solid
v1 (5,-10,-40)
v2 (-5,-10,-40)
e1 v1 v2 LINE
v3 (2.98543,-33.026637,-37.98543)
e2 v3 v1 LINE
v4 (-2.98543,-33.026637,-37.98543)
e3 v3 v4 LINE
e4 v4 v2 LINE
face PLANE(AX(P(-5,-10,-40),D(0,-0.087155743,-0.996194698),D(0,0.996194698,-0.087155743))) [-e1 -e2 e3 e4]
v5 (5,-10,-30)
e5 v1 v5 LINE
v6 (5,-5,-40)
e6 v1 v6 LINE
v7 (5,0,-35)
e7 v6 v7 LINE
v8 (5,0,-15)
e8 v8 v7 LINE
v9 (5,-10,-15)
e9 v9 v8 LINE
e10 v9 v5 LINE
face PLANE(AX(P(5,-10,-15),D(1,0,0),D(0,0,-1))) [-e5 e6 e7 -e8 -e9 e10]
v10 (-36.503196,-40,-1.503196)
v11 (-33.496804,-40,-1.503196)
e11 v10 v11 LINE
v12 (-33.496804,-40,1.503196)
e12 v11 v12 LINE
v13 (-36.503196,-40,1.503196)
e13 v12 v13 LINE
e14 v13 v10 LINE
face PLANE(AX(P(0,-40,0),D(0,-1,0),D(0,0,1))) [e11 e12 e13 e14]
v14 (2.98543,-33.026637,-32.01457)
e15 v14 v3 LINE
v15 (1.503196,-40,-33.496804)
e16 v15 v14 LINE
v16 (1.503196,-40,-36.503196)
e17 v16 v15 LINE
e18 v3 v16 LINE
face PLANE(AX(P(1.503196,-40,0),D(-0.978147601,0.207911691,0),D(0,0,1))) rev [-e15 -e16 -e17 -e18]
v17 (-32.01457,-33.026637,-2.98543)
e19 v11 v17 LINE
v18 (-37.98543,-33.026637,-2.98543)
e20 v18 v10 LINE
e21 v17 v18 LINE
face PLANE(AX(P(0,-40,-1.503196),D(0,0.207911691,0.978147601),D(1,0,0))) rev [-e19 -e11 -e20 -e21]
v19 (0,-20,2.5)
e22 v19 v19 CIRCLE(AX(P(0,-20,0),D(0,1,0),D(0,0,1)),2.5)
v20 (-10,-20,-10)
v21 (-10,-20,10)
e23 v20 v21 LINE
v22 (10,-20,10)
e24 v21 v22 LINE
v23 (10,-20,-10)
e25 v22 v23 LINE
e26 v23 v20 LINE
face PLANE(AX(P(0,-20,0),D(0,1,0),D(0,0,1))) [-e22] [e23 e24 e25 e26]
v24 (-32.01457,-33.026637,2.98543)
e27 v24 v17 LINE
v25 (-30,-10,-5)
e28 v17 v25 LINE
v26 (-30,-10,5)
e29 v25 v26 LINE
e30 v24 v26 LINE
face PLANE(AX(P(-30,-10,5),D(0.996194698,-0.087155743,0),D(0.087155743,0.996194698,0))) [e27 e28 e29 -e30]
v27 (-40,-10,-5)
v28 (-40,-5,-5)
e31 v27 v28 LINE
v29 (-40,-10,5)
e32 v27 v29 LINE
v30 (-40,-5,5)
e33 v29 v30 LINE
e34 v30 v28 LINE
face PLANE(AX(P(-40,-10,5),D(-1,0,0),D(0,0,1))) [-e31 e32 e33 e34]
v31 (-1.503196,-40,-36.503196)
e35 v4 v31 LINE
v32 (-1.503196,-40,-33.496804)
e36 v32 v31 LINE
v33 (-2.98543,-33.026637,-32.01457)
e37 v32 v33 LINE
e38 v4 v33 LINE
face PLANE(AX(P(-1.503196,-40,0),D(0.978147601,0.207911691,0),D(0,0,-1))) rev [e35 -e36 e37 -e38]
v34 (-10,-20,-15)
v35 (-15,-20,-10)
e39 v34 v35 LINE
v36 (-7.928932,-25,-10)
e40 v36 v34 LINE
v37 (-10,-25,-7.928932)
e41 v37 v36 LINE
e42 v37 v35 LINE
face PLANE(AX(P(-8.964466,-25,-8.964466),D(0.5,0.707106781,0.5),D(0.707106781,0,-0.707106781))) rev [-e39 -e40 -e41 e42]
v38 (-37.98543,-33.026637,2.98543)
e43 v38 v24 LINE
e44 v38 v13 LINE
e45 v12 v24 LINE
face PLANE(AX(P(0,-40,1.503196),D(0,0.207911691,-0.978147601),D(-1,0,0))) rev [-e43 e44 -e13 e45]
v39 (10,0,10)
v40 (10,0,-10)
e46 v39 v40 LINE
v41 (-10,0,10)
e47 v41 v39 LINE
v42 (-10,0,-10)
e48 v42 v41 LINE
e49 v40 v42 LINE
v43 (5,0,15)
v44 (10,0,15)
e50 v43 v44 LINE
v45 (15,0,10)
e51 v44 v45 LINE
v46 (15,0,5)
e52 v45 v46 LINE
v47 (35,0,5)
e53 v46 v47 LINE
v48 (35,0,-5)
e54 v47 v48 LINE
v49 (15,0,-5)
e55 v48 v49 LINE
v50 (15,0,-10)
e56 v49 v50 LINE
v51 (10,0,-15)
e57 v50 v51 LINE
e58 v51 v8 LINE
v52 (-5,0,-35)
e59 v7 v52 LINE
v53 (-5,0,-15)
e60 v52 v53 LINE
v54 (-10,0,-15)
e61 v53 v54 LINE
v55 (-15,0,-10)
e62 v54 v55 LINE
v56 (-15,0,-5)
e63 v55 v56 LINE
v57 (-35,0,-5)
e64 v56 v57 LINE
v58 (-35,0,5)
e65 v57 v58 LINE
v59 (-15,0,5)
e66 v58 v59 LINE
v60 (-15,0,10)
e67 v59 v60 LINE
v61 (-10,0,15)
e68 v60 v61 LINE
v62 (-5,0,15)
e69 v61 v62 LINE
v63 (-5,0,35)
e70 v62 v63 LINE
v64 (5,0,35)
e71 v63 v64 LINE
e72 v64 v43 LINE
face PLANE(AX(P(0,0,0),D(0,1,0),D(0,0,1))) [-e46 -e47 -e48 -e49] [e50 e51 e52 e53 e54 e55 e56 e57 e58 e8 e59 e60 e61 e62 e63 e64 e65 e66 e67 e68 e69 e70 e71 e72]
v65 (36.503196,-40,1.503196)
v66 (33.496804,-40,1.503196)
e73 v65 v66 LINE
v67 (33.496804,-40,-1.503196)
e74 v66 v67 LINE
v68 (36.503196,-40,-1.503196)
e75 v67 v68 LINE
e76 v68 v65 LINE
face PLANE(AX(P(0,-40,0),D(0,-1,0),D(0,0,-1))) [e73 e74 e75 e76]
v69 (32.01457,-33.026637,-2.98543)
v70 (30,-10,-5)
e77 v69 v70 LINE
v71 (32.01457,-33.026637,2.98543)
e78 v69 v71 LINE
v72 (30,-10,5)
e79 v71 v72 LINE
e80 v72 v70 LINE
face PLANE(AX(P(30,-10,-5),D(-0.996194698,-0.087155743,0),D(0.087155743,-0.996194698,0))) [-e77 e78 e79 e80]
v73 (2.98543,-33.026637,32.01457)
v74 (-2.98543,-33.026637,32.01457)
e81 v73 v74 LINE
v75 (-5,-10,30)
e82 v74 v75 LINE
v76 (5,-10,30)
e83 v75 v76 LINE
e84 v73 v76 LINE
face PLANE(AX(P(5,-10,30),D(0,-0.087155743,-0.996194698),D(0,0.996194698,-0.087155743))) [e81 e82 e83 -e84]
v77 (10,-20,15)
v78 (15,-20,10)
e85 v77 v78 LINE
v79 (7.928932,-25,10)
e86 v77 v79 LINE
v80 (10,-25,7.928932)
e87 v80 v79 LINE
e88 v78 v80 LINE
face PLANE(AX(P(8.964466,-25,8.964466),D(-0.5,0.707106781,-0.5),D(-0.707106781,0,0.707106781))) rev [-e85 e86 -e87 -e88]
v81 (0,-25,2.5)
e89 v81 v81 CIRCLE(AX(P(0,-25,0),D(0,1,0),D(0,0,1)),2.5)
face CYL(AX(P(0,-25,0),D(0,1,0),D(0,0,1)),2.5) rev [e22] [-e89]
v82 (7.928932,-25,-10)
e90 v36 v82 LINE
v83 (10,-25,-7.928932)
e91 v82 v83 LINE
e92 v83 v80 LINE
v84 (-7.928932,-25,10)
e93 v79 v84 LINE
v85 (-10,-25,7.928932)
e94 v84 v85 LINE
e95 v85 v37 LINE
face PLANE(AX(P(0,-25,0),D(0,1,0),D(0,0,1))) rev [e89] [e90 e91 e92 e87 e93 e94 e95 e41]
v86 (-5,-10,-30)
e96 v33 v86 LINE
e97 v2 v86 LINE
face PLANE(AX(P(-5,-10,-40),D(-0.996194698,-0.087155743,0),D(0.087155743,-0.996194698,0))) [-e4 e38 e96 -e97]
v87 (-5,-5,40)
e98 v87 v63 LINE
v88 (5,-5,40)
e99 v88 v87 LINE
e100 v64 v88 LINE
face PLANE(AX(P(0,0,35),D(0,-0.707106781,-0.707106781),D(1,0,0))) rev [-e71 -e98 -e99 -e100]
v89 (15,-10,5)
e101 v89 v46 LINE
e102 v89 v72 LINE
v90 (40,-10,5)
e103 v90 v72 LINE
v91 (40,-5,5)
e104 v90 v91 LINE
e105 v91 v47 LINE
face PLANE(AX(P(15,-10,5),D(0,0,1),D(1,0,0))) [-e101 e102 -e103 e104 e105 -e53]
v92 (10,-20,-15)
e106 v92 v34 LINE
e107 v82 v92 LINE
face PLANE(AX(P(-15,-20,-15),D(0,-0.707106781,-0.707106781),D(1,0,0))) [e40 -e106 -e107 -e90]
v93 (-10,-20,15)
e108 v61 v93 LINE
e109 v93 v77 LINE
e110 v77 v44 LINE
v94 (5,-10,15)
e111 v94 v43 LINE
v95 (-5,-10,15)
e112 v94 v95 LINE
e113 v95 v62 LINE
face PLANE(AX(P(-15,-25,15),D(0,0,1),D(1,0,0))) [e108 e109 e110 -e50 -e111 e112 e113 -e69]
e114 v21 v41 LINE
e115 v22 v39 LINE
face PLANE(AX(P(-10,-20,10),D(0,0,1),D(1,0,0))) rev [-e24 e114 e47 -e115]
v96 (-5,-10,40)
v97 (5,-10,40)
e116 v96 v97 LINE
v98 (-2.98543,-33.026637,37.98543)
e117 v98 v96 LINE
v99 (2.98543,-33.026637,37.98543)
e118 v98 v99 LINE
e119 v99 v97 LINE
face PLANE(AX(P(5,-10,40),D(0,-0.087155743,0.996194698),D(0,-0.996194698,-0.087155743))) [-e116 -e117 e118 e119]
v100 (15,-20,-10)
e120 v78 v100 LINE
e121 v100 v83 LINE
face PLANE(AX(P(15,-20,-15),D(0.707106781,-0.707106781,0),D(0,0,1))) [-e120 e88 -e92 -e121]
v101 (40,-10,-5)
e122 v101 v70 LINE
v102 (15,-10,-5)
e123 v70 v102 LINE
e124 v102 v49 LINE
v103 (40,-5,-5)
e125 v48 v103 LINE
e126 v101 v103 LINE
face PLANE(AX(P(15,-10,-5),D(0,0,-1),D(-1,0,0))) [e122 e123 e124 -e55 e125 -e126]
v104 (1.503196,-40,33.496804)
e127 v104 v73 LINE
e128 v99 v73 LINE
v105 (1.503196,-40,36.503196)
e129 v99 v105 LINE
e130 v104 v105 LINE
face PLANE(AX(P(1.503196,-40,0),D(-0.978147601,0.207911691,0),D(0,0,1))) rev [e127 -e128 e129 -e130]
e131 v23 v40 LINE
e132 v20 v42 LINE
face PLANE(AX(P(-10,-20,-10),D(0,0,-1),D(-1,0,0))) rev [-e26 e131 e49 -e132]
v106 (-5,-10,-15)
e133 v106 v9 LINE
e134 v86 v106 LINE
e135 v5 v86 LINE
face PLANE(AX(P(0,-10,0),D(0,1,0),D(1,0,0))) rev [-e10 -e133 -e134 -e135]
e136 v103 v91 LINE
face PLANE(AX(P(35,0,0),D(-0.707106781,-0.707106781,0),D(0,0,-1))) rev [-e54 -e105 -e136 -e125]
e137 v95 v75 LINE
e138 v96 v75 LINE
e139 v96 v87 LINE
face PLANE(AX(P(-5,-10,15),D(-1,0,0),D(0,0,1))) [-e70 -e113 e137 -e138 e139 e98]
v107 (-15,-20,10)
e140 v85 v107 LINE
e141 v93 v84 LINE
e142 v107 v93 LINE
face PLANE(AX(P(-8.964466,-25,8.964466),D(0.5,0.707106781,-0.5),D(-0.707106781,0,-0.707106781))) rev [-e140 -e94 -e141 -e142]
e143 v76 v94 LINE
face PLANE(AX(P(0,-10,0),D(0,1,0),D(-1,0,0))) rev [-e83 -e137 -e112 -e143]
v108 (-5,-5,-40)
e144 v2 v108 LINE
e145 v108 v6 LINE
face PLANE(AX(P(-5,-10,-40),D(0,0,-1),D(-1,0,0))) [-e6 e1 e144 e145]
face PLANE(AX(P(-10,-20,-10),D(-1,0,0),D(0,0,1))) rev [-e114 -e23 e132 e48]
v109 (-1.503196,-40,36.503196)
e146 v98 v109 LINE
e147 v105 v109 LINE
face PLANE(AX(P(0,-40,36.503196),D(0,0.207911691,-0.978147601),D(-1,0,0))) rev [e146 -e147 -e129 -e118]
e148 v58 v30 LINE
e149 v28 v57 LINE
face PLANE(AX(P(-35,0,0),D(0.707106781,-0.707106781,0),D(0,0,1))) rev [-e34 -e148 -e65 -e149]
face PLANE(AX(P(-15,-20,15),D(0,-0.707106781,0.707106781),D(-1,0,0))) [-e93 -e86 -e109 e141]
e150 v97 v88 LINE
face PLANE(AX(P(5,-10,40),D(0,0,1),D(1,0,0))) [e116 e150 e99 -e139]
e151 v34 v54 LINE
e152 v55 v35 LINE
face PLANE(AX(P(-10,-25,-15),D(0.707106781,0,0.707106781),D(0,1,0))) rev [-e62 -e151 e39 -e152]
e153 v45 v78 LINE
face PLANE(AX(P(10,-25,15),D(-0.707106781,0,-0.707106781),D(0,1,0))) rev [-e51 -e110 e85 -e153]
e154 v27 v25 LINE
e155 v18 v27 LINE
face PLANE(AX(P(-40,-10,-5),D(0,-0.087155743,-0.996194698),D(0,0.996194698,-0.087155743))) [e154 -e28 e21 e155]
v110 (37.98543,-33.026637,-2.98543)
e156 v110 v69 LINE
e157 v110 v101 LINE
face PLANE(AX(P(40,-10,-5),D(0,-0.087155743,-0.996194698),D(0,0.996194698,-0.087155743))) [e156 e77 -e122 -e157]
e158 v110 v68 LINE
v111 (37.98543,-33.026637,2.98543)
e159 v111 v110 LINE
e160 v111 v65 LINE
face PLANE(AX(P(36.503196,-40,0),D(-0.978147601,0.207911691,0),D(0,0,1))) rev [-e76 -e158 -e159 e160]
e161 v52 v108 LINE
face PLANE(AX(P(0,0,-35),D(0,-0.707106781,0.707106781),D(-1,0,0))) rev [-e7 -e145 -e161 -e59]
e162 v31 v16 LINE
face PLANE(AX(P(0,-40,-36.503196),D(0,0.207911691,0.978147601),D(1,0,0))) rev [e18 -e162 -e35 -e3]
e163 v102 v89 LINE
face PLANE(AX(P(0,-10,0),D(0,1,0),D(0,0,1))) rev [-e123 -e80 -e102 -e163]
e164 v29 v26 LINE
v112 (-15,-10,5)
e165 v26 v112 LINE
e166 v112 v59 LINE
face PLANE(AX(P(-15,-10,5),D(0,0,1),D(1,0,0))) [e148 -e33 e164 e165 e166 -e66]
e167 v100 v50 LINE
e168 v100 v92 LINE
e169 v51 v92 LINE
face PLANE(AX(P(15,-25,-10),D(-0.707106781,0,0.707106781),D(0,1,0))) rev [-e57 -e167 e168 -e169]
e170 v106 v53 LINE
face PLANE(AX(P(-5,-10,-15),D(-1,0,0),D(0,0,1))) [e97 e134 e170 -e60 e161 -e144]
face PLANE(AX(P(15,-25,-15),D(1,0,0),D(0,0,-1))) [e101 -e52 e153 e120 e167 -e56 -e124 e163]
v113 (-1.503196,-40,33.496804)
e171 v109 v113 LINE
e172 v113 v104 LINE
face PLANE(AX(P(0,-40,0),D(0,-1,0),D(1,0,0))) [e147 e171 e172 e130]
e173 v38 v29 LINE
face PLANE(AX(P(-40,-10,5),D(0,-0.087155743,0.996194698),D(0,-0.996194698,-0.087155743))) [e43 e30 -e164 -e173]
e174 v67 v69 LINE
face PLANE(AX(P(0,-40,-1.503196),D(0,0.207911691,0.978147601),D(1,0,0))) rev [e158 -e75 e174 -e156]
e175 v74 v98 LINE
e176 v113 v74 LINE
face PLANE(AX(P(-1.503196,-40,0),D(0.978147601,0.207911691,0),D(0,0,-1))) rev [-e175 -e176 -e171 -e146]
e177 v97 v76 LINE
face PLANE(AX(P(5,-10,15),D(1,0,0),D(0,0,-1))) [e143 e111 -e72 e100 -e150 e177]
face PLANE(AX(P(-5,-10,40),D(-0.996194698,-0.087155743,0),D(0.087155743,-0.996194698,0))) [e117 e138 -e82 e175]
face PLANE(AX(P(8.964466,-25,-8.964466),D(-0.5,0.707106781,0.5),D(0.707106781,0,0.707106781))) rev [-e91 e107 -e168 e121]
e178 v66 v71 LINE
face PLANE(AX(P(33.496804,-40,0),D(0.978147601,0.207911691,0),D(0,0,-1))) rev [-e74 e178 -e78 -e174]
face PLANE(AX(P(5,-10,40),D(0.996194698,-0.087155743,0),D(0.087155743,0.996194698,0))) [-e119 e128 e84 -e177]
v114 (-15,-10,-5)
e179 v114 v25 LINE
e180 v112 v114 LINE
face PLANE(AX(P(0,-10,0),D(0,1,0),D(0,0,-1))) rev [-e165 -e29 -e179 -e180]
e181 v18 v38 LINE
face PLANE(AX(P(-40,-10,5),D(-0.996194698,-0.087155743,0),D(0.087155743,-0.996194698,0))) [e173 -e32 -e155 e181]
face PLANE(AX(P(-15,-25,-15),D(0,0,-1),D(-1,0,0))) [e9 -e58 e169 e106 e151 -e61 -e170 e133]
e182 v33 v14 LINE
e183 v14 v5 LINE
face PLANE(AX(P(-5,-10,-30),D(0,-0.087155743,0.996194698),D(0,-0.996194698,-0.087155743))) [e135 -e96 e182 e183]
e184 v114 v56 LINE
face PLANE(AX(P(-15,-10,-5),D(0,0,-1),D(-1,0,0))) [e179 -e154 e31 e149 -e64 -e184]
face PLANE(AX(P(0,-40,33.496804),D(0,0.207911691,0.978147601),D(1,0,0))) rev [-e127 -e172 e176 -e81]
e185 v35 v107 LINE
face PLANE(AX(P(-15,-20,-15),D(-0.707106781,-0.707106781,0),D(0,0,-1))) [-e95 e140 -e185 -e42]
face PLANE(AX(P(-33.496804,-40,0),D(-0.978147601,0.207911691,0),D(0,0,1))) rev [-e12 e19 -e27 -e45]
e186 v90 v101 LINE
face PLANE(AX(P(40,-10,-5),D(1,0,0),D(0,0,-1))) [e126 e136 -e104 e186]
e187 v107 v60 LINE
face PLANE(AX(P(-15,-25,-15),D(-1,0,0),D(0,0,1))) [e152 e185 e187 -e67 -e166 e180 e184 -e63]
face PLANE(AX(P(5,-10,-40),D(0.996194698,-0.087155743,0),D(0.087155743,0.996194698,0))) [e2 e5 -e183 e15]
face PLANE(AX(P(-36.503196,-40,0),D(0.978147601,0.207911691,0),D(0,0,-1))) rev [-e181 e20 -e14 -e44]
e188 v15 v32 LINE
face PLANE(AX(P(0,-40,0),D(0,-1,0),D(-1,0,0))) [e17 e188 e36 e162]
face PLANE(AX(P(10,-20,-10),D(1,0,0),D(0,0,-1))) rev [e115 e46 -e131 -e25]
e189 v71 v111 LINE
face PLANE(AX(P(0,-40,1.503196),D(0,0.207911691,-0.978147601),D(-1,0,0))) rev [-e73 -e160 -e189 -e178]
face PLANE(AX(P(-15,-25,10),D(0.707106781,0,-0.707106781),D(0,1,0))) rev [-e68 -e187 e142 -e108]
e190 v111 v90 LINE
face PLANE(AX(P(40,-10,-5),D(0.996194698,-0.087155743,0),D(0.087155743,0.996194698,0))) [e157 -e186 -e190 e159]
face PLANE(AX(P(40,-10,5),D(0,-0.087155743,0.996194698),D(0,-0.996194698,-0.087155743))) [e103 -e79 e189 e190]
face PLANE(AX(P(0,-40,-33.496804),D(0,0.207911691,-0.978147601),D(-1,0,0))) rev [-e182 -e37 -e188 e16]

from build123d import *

# Parameters (mm, degrees)
SKETCH1_W         = 30
SKETCH1_H         = 30
CENTER_DEPTH      = 25
SKETCH2_W         = 20
SKETCH2_H         = 20
CENTER_HOLE_DEPTH = 20
SKETCH3_W         = 25
SKETCH3_H         = 10
ARM_DEPTH         = 10
SKETCH5_R         = 2.5
SCREW_HOLE_DEPTH  = 48.16990566
SKETCH7_W         = 10
SKETCH7_H         = 10
LEG_DEPTH         = 30
LEG_TAPER         = 5
CIRPATTERN1_COUNT = 4
CHAMFER1_SIZE     = 5
CHAMFER2_SIZE     = 5
CHAMFER3_SIZE     = 5
CHAMFER4_SIZE     = 7
CHAMFER4_SIZE_2   = 0.872143839


with BuildPart() as part:
    # Sketch1 → center (new body)
    with BuildSketch(Plane(origin=(0, 0, 0), x_dir=(1, 0, 0), z_dir=(0, 1, 0))):
        Rectangle(SKETCH1_W, SKETCH1_H)
    extrude(amount=-CENTER_DEPTH)

    # Sketch2 → center hole (cut)
    with BuildSketch(Plane(origin=(0, 0, 0), x_dir=(1, 0, 0), z_dir=(0, 1, 0))):
        Rectangle(SKETCH2_W, SKETCH2_H)
    extrude(amount=-CENTER_HOLE_DEPTH, mode=Mode.SUBTRACT)

    # Sketch3 → arm (add)
    with BuildSketch(Plane(origin=(0, 0, 0), x_dir=(1, 0, 0), z_dir=(0, 1, 0))):
        with Locations((27.5, 0)):
            Rectangle(SKETCH3_W, SKETCH3_H)
    arm = extrude(amount=-ARM_DEPTH)

    # Sketch5 → screw hole (cut, through all)
    with BuildSketch(Plane(origin=(0, -20, 0), x_dir=(1, 0, 0), z_dir=(0, 1, 0))):
        with Locations(Location((0, 0, 0), (0, 0, 270))):
            Circle(SKETCH5_R)
    extrude(amount=-SCREW_HOLE_DEPTH, mode=Mode.SUBTRACT)

    # Sketch7 → leg (add)
    with BuildSketch(Plane.XZ.offset(10)):
        with Locations((35, 0)):
            Rectangle(SKETCH7_W, SKETCH7_H)
    leg = extrude(amount=LEG_DEPTH, taper=LEG_TAPER)

    # CirPattern1: arm, leg ×4 about axis
    cirpattern1_axis = Axis((0, 0, 0), (0, 1, 0))
    add([arm.rotate(cirpattern1_axis, i * 360 / CIRPATTERN1_COUNT) for i in range(1, CIRPATTERN1_COUNT)])
    add([leg.rotate(cirpattern1_axis, i * 360 / CIRPATTERN1_COUNT) for i in range(1, CIRPATTERN1_COUNT)])

    # Chamfer1
    chamfer1_edges = [part.edges().sort_by_distance(p)[0] for p in [
        (15, -12.5, 15),
        (-15, -12.5, 15),
        (-15, -12.5, -15),
        (15, -12.5, -15),
    ]]
    chamfer(chamfer1_edges, length=CHAMFER1_SIZE)

    # Chamfer2
    chamfer2_edges = [part.edges().sort_by_distance(p)[0] for p in [
        (40, 0, 0),
        (0, 0, -40),
        (-40, 0, 0),
        (0, 0, 40),
    ]]
    chamfer(chamfer2_edges, length=CHAMFER2_SIZE)

    # Chamfer3
    chamfer3_edges = [part.edges().sort_by_distance(p)[0] for p in [
        (-15, -25, 0),
        (0, -25, 15),
        (15, -25, 0),
        (0, -25, -15),
        (12.5, -25, 12.5),
        (12.5, -25, -12.5),
        (-12.5, -25, -12.5),
        (-12.5, -25, 12.5),
    ]]
    chamfer(chamfer3_edges, length=CHAMFER3_SIZE)

    # Chamfer4
    # the kernel refuses this chamfer: 7, 0.872143839 mm, written as the material it takes off along each edge
    with BuildSketch(Plane(origin=(-37.375340094, -40, 20.570322389), x_dir=(-0.08715574274765861, 0.9961946980917454, 0), z_dir=(0, 0, -1)), Plane(origin=(-55.570322389, -40, -2.375340094), x_dir=(0, 0.9961946980917455, -0.08715574274765818), z_dir=(1, 0, 0)), Plane(origin=(-32.624659906, -40, -20.570322389), x_dir=(0.08715574274765861, 0.9961946980917454, 0), z_dir=(0, 0, 1)), Plane(origin=(-14.429677611, -40, 2.375340094), x_dir=(0, 0.9961946980917455, 0.08715574274765825), z_dir=(-1, 0, 0)), Plane(origin=(20.570322389, -40, 37.375340094), x_dir=(0, 0.9961946980917454, 0.08715574274765861), z_dir=(-1, 0, 0)), Plane(origin=(-2.375340094, -40, 55.570322389), x_dir=(-0.08715574274765818, 0.9961946980917455, 0), z_dir=(0, 0, -1)), Plane(origin=(-20.570322389, -40, 32.624659906), x_dir=(0, 0.9961946980917454, -0.08715574274765861), z_dir=(1, 0, 0)), Plane(origin=(2.375340094, -40, 14.429677611), x_dir=(0.08715574274765818, 0.9961946980917455, 0), z_dir=(0, 0, 1)), Plane(origin=(37.375340094, -40, -20.570322389), x_dir=(0.08715574274765861, 0.9961946980917454, 0), z_dir=(0, 0, 1)), Plane(origin=(55.570322389, -40, 2.375340094), x_dir=(0, 0.9961946980917455, 0.08715574274765825), z_dir=(-1, 0, 0)), Plane(origin=(32.624659906, -40, 20.570322389), x_dir=(-0.08715574274765861, 0.9961946980917454, 0), z_dir=(0, 0, -1)), Plane(origin=(14.429677611, -40, -2.375340094), x_dir=(0, 0.9961946980917455, -0.08715574274765825), z_dir=(1, 0, 0)), Plane(origin=(-20.570322389, -40, -37.375340094), x_dir=(0, 0.9961946980917454, -0.08715574274765861), z_dir=(1, 0, 0)), Plane(origin=(2.375340094, -40, -55.570322389), x_dir=(0.08715574274765818, 0.9961946980917455, 0), z_dir=(0, 0, 1)), Plane(origin=(20.570322389, -40, -32.624659906), x_dir=(0, 0.9961946980917454, 0.08715574274765861), z_dir=(-1, 0, 0)), Plane(origin=(-2.375340094, -40, -14.429677611), x_dir=(-0.08715574274765818, 0.9961946980917455, 0), z_dir=(0, 0, -1))) as chamfer4_piece_1:
        Polygon((CHAMFER4_SIZE, 0), (-CHAMFER4_SIZE_2 * 0.0871557427705, CHAMFER4_SIZE_2 * 0.996194698353), (0, 0), align=None)
    extrude(amount=41.140644778, mode=Mode.SUBTRACT)


solid = part.part
